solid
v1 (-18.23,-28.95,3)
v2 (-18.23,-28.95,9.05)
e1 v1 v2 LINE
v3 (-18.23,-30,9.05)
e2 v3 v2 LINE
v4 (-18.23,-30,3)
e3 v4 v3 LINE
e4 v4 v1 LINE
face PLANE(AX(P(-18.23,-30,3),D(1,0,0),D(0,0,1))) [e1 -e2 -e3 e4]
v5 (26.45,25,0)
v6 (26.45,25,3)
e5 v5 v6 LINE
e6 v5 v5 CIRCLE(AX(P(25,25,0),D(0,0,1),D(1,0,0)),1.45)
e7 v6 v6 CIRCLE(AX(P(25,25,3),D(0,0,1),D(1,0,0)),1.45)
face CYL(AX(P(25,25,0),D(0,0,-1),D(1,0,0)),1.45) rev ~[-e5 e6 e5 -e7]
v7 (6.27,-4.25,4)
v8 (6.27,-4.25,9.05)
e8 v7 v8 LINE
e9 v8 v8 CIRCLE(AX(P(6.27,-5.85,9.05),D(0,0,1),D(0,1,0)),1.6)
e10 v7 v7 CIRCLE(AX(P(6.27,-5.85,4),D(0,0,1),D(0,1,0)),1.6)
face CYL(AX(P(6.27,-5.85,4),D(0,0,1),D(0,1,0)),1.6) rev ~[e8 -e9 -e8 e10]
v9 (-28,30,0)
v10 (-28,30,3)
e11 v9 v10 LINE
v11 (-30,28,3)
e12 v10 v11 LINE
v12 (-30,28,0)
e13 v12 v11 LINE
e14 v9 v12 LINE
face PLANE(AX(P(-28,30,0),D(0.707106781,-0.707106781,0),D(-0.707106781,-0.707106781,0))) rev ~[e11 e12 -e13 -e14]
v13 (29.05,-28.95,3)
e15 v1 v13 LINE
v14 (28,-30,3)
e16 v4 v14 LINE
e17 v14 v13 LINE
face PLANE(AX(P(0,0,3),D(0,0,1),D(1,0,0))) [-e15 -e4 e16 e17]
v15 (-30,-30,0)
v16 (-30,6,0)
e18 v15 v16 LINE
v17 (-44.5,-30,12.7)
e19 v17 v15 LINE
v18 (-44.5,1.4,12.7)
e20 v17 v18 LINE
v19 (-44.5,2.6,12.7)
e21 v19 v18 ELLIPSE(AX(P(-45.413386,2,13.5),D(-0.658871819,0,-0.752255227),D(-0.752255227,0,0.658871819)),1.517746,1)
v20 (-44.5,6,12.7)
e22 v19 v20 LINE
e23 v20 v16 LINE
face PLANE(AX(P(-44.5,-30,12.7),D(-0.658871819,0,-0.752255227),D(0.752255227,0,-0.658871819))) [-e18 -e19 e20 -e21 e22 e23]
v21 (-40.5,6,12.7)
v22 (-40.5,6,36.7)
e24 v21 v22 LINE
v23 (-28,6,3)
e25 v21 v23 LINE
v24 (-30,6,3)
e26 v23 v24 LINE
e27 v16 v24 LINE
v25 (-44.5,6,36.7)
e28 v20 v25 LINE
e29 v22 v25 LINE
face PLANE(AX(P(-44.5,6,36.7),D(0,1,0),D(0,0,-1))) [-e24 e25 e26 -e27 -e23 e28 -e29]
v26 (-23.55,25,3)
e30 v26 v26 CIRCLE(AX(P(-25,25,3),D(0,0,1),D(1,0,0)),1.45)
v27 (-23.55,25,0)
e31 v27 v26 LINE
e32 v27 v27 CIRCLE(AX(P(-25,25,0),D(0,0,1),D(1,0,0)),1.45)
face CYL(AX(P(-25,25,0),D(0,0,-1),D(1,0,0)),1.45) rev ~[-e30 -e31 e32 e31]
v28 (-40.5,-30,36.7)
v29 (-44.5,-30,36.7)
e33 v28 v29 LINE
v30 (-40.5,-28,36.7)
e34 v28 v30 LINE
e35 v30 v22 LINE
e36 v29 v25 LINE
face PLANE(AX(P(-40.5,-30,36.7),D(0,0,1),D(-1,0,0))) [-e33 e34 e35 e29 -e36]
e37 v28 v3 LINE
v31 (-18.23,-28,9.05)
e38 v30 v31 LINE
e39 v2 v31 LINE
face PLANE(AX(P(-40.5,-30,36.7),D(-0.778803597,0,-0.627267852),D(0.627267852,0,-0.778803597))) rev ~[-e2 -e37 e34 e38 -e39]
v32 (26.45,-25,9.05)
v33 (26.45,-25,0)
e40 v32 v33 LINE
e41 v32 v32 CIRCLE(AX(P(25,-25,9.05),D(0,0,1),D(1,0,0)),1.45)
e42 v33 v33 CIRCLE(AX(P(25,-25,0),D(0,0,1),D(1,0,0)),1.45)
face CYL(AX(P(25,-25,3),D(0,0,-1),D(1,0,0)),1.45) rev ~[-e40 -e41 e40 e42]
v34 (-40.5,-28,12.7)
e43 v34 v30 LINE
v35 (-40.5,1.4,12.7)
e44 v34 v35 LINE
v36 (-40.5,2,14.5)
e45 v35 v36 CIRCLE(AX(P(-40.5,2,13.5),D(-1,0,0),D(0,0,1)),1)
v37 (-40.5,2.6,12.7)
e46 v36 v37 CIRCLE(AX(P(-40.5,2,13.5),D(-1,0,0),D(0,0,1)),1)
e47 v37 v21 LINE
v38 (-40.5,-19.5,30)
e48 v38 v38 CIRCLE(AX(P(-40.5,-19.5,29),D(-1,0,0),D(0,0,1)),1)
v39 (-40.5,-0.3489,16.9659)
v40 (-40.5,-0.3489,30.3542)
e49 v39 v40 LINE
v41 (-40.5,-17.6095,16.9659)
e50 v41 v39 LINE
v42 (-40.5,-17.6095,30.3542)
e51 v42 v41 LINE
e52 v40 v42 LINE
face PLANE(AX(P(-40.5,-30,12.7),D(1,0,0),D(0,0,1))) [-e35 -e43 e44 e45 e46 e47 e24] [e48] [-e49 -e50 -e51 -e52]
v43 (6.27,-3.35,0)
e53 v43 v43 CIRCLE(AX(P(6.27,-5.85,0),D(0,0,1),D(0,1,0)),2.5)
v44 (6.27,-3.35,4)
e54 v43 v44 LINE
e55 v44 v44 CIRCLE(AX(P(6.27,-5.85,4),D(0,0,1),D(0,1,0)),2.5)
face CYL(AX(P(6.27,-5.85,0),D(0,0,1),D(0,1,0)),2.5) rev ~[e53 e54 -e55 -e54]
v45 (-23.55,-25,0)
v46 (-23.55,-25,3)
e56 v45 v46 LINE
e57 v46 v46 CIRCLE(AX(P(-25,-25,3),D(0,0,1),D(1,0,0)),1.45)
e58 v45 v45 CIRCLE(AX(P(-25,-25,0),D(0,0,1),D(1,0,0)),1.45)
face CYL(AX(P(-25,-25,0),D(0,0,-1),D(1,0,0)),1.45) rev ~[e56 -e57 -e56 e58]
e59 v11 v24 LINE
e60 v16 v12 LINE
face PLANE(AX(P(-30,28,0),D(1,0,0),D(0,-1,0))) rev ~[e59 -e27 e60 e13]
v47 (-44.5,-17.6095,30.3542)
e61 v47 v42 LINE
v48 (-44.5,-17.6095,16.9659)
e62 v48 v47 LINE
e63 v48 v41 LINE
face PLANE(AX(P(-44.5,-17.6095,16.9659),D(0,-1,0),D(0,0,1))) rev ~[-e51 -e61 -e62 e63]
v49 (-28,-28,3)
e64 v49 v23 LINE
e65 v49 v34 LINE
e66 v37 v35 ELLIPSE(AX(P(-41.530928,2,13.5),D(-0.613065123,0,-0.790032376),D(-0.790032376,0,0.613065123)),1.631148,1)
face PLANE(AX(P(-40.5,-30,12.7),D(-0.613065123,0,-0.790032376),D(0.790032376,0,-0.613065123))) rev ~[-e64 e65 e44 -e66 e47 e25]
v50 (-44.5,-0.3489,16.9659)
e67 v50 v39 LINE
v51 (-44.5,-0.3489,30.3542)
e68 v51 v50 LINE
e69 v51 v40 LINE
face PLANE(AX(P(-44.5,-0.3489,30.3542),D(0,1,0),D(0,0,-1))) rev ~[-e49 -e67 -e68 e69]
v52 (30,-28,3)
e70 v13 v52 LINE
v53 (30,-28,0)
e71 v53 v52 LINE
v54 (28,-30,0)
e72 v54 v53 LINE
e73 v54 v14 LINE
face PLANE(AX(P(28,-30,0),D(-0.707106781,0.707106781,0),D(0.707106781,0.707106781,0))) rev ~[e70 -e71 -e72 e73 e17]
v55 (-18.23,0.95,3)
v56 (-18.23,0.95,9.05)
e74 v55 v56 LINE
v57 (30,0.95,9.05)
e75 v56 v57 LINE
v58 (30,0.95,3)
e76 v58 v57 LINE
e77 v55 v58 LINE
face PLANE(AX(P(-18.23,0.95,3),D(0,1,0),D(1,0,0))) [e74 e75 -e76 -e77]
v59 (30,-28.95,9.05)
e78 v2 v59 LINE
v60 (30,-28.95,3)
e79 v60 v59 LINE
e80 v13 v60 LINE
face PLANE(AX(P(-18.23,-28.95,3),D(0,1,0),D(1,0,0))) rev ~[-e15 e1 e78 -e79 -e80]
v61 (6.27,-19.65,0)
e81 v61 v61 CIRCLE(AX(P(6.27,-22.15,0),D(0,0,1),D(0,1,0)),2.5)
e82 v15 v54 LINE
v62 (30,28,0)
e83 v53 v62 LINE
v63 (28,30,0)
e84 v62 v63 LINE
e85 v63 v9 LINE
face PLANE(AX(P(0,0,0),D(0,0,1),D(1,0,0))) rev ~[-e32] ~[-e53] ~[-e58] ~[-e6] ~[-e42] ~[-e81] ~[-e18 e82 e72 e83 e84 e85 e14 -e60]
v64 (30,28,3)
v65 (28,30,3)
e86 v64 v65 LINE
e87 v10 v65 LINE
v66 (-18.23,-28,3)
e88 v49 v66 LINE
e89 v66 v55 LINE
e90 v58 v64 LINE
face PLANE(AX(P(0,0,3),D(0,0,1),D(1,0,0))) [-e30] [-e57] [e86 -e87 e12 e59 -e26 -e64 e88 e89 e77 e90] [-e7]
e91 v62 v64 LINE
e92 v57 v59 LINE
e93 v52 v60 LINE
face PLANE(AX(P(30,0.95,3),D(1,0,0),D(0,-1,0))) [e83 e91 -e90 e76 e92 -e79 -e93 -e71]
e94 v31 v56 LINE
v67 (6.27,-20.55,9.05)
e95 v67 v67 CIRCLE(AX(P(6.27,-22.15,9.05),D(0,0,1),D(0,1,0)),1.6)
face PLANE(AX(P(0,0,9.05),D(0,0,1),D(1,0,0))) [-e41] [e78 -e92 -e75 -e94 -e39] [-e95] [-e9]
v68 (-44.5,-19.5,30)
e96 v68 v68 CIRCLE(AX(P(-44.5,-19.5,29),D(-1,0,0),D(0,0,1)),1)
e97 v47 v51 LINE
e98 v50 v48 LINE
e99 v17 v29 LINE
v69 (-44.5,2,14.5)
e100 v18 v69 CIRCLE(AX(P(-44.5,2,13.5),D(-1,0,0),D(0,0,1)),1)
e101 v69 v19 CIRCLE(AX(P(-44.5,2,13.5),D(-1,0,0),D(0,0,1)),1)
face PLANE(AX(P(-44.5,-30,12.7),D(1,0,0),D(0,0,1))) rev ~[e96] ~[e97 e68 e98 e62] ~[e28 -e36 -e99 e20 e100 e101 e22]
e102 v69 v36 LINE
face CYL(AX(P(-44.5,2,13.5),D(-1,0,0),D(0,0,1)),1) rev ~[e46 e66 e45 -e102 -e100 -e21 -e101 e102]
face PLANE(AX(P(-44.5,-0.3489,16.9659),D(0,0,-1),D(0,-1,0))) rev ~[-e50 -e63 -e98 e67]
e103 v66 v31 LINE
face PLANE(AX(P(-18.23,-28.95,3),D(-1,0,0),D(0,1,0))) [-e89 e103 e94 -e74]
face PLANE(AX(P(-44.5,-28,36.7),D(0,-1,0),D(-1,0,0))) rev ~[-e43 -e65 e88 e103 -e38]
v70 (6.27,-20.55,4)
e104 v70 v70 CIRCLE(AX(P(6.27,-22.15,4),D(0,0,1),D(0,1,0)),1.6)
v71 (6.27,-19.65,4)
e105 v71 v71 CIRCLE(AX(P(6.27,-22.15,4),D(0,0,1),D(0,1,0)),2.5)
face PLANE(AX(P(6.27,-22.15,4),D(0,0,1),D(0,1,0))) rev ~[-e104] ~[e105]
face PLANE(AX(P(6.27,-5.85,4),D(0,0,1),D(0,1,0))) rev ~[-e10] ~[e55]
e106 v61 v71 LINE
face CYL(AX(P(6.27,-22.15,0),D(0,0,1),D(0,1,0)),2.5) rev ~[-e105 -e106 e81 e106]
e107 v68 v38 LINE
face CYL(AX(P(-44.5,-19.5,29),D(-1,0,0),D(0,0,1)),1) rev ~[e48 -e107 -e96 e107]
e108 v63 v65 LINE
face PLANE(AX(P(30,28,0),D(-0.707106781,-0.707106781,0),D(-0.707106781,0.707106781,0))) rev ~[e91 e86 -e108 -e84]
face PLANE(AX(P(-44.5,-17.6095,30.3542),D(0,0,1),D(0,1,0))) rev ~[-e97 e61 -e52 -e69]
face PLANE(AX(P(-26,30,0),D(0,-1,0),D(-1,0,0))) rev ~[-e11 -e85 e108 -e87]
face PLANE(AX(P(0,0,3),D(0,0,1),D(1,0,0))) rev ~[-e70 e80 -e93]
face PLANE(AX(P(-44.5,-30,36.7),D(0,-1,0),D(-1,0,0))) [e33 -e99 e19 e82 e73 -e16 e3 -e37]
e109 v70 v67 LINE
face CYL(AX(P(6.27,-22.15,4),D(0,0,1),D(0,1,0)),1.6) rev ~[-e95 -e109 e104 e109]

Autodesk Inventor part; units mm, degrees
ref_plane "Work Plane1" through (0, 0, 0) normal (0, 0, 1) x (1, 0, 0)
sketch "Sketch1" plane through (0, 0, 0) normal (0, 0, 1) x (1, 0, 0)
  circle A0 centre (0, 25) radius 1.95 construction
  circle A1 centre (-25, 0) radius 1.95 construction
  circle A2 centre (-25, -25) radius 1.95 construction
  circle A3 centre (25, 25) radius 1.95 construction
  circle A4 centre (25, -25) radius 1.95 construction
  circle A5 centre (-25, 25) radius 1.95 construction
  circle A6 centre (25, 0) radius 1.95 construction
  circle A7 centre (0, -25) radius 1.95 construction
  line L0 (-28, 30) -> (-30, 28) projected
  line L1 (-30, 28) -> (-30, -28) projected
  line L2 (-30, -28) -> (-28, -30) projected
  line L3 (-28, -30) -> (28, -30) projected
  line L4 (28, -30) -> (30, -28) projected
  line L5 (30, -28) -> (30, 28) projected
  line L6 (30, 28) -> (28, 30) projected
  line L7 (28, 30) -> (-28, 30) projected
  circle A8 centre (25, 25) radius 1.45
  circle A9 centre (25, -25) radius 1.45
  circle A10 centre (-25, -25) radius 1.45
  circle A11 centre (-25, 25) radius 1.45
  circle A12 centre (0, 25) radius 1.95 projected
  circle A13 centre (-25, 0) radius 1.95 projected
  circle A14 centre (-25, -25) radius 1.95 projected
  circle A15 centre (25, 25) radius 1.95 projected
  circle A16 centre (25, -25) radius 1.95 projected
  circle A17 centre (-25, 25) radius 1.95 projected
  circle A18 centre (25, 0) radius 1.95 projected
  circle A19 centre (0, -25) radius 1.95 projected
  line L8 (-28, 30) -> (-30, 28) projected
  line L9 (-30, 28) -> (-30, -28) projected
  line L10 (-30, -28) -> (-28, -30) projected
  line L11 (-28, -30) -> (28, -30) projected
  line L12 (28, -30) -> (30, -28) projected
  line L13 (30, -28) -> (30, 28) projected
  line L14 (30, 28) -> (28, 30) projected
  line L15 (28, 30) -> (-28, 30) projected
  line L16 (-44.5, 28.8555) -> (-44.5, 2)
  line L17 (-44.5, 34) -> (-45.5, 34)
  line L18 (-45.5, 1) -> (-44.5, 1)
  line L19 (-44.5, 34) -> (-30, 34)
  line L20 (-30, 34) -> (-30, 1)
  line L21 (-30, 1) -> (-44.5, 1)
  line L22 (-44.5, 1) -> (-44.5, 34)
  line L23 (-30, 34) -> (-26, 30)
  line L24 (-30, 34) -> (-24.3431, 34) construction
  point P0 (0, 0)
  dimension "d0" = 2.9
  dimension "d1" = 2.9
  dimension "d2" = 2.9
  dimension "d3" = 2.9
  dimension "d6" = 45
ref_plane "Work Plane2" through (-18, -2, 8) normal (0, 0, -1) x (0, 1, 0)
extrude "Extrusion1" add sketch "Sketch1" along normal blind 3 contours L7 L6 L5 L4 L3 L2 L1 L0 | A12 | A13 | A14 | A15 | A16 | A17 | A18 | A19
sketch "Sketch2" plane through (0, 0, 3) normal (0, 0, 1) x (1, 0, 0)
  arc A0 (7.0684, -7) -> (5.4716, -7) centre (6.27, -5.85) ccw
  arc A1 (5.4716, -21) -> (7.0684, -21) centre (6.27, -22.15) ccw
  line L0 (-18.23, -28.95) -> (30, -28.95)
  line L1 (-18.23, 0.95) -> (30, 0.95)
  line L2 (-18.23, 0.95) -> (30, 0.95)
  line L3 (30, 0.95) -> (30, -28.95)
  line L4 (30, -28.95) -> (-18.23, -28.95)
  line L5 (-18.23, -28.95) -> (-18.23, 0.95)
  circle A2 centre (6.27, -5.85) radius 1.4
  circle A3 centre (6.27, -22.15) radius 1.4
  circle A4 centre (25, -25) radius 1.45 projected
  point P0 (0, 0)
ref_plane "Work Plane3" through (-18, -2, 8) normal (0, 0, -1) x (0, 1, 0)
ref_plane "Work Plane6" through (-18.23, -26.95, 9.05) normal (0, 0, -1) x (0, 1, 0)
extrude "Extrusion2" add sketch "Sketch2" along normal up to surface (6.05 mm away)
sketch "Sketch3" plane through (0, 0, 0) normal (0, 0, -1) x (-1, 0, 0)
  line L0 (-30, -28.95) -> (-30, 0.95) projected
  line L1 (18.23, -28.95) -> (-30, -28.95) projected
  line L2 (-30, 0.95) -> (18.23, 0.95) projected
  line L3 (18.23, 0.95) -> (18.23, -28.95) projected
  arc A0 (-5.4716, -7) -> (-7.0684, -7) centre (-6.27, -5.85) ccw
  arc A1 (-7.0684, -21) -> (-5.4716, -21) centre (-6.27, -22.15) ccw
  point P0 (0, 0)
hole "Hole2" at (6.27, -22.15, 0) at (6.27, -5.85, 0) direction (0, 0, 1) diameter 3.2 depth 20 tip angle 118 counterbore diameter 5 counterbore depth 4
ref_plane "Work Plane4" through (-44.5, 34, 36.7) normal (0, 1, 0) x (0, 0, -1)
sketch "Sketch5" plane through (-44.5, -30, 36.7) normal (0, 1, 0) x (0, 0, -1)
  line L0 (36.7, -72.5) -> (36.7, -16.5) projected
  line L1 (36.7, -16.5) -> (33.7, -16.5) projected
  line L2 (33.7, -72.5) -> (33.7, -16.5) projected
  line L3 (36.7, -72.5) -> (33.7, -72.5) projected
  line L4 (25.7, 0) -> (0, 0) projected
  line L5 (25.7, 0) -> (25.7, 1) projected
  line L6 (0, 1) -> (25.7, 1) projected
  line L7 (0, 0) -> (0, 1) projected
  line L8 (0, 0) -> (24, 0)
  line L9 (24, 0) -> (24, -4)
  line L10 (24, -4) -> (0, -4)
  line L11 (0, -4) -> (0, 0)
  line L12 (24, -4) -> (33.7, -16.5)
  line L13 (36.7, -16.5) -> (36.7, -14.5) projected
  line L14 (36.7, -14.5) -> (36.7, -16.5) projected
  line L15 (24, 0) -> (36.7, -14.5)
  line L16 (36.7, -16.5) -> (33.7, -16.5) projected
  line L17 (36.7, -14.5) -> (36.7, -16.5)
  point P0 (36.7, -44.5)
  dimension "d23" = 24
  dimension "d24" = 4
ref_plane "Work Plane5" through (-45.5, 1, 28.397) normal (0, -1, 0) x (1, 0, 0)
extrude "Extrusion3" add sketch "Sketch5" along normal up to surface (36 mm away) contours L1 L12 L9 L15 L13 | L10 L11 L4 L9
sketch "Sketch6" plane through (-44.5, -30, 36.7) normal (0, -1, 0) x (-1, 0, 0)
  line L0 (-14.5, 36.7) -> (-72.5, 36.7) projected
  line L1 (-72.5, 36.7) -> (-72.5, 33.7) projected
  line L2 (-16.5, 33.7) -> (-72.5, 33.7) projected
  line L3 (-16.5, 33.7) -> (-4, 24) projected
  line L4 (-4, 24) -> (-4, 0) projected
  line L5 (-4, 0) -> (0, 0) projected
  line L6 (0, 0) -> (0, 24) projected
  line L7 (0, 24) -> (-14.5, 36.7) projected
  line L8 (-26.27, 27.65) -> (-74.5, 27.65) projected
  line L9 (-26.27, 33.7) -> (-26.27, 27.65) projected
  line L10 (-73.55, 33.7) -> (-26.27, 33.7) projected
  line L11 (-73.55, 33.7) -> (-74.5, 33.7) projected
  line L12 (-74.5, 33.7) -> (-74.5, 27.65) projected
  line L13 (-74.5, 27.65) -> (-26.27, 27.65) projected
  line L14 (-4, 0) -> (-26.27, 27.65)
  line L15 (-26.27, 33.7) -> (-26.27, 27.65) projected
  line L16 (-26.27, 27.65) -> (-26.27, 33.7)
  line L17 (-26.27, 33.7) -> (-16.5, 33.7)
  line L18 (-16.5, 33.7) -> (-4, 24)
  line L19 (-4, 24) -> (-4, 0)
  point P0 (-44.5, 36.7)
extrude "Extrusion4" add sketch "Sketch6" against normal blind 2 contours L2 L3 L4 L14 L9
sketch "Sketch7" plane through (-44.5, 6, 36.7) normal (-1, 0, 0) x (0, 0, 1)
  circle A0 centre (-2.7, 2.5) radius 1
  circle A1 centre (-7.7, -25.5) radius 1
  circle A2 centre (-23.2, -4) radius 1
  circle A3 centre (-12.7, -15) radius 2.6486
  line L0 (-6.3458, -6.3489) -> (-19.7341, -6.3489)
  line L1 (-19.7341, -6.3489) -> (-19.7341, -23.6095)
  line L2 (-19.7341, -23.6095) -> (-6.3458, -23.6095)
  line L3 (-6.3458, -23.6095) -> (-6.3458, -6.3489)
extrude "Extrusion5" cut sketch "Sketch7" against normal through all contours A0 | A1 | A2 | A3 | L3 L2 L1 L0
sketch "Sketch8" plane through (0, 0, 0) normal (0, 0, -1) x (-1, 0, 0)
  line L0 (-28, 30) -> (28, 30) projected
  line L1 (-30, 28) -> (-28, 30) projected
  line L2 (-30, -28) -> (-30, 28) projected
  line L3 (-28, -30) -> (-30, -28) projected
  line L4 (30, 28) -> (30, 6) projected
  line L5 (30, 6) -> (30, -30) projected
  line L6 (30, -30) -> (-28, -30) projected
  circle A0 centre (25, -25) radius 1.45 projected
  circle A1 centre (-25, 25) radius 1.45 projected
  circle A2 centre (-25, -25) radius 1.45 projected
  circle A3 centre (25, 25) radius 1.45 projected
  line L7 (71, -30) -> (71, -28) projected
  line L8 (71, -30) -> (131, 30)
  line L9 (71, -30) -> (155.8528, -30) construction
  line L10 (-28, 30) -> (28, 30) projected
  line L11 (28, 30) -> (30, 28) projected
  point P0 (0, 0)
  dimension "d31" = 135
extrude "Extrusion6" [suppressed]
properties part number "cellSTORM_inverted_Laser_left"
